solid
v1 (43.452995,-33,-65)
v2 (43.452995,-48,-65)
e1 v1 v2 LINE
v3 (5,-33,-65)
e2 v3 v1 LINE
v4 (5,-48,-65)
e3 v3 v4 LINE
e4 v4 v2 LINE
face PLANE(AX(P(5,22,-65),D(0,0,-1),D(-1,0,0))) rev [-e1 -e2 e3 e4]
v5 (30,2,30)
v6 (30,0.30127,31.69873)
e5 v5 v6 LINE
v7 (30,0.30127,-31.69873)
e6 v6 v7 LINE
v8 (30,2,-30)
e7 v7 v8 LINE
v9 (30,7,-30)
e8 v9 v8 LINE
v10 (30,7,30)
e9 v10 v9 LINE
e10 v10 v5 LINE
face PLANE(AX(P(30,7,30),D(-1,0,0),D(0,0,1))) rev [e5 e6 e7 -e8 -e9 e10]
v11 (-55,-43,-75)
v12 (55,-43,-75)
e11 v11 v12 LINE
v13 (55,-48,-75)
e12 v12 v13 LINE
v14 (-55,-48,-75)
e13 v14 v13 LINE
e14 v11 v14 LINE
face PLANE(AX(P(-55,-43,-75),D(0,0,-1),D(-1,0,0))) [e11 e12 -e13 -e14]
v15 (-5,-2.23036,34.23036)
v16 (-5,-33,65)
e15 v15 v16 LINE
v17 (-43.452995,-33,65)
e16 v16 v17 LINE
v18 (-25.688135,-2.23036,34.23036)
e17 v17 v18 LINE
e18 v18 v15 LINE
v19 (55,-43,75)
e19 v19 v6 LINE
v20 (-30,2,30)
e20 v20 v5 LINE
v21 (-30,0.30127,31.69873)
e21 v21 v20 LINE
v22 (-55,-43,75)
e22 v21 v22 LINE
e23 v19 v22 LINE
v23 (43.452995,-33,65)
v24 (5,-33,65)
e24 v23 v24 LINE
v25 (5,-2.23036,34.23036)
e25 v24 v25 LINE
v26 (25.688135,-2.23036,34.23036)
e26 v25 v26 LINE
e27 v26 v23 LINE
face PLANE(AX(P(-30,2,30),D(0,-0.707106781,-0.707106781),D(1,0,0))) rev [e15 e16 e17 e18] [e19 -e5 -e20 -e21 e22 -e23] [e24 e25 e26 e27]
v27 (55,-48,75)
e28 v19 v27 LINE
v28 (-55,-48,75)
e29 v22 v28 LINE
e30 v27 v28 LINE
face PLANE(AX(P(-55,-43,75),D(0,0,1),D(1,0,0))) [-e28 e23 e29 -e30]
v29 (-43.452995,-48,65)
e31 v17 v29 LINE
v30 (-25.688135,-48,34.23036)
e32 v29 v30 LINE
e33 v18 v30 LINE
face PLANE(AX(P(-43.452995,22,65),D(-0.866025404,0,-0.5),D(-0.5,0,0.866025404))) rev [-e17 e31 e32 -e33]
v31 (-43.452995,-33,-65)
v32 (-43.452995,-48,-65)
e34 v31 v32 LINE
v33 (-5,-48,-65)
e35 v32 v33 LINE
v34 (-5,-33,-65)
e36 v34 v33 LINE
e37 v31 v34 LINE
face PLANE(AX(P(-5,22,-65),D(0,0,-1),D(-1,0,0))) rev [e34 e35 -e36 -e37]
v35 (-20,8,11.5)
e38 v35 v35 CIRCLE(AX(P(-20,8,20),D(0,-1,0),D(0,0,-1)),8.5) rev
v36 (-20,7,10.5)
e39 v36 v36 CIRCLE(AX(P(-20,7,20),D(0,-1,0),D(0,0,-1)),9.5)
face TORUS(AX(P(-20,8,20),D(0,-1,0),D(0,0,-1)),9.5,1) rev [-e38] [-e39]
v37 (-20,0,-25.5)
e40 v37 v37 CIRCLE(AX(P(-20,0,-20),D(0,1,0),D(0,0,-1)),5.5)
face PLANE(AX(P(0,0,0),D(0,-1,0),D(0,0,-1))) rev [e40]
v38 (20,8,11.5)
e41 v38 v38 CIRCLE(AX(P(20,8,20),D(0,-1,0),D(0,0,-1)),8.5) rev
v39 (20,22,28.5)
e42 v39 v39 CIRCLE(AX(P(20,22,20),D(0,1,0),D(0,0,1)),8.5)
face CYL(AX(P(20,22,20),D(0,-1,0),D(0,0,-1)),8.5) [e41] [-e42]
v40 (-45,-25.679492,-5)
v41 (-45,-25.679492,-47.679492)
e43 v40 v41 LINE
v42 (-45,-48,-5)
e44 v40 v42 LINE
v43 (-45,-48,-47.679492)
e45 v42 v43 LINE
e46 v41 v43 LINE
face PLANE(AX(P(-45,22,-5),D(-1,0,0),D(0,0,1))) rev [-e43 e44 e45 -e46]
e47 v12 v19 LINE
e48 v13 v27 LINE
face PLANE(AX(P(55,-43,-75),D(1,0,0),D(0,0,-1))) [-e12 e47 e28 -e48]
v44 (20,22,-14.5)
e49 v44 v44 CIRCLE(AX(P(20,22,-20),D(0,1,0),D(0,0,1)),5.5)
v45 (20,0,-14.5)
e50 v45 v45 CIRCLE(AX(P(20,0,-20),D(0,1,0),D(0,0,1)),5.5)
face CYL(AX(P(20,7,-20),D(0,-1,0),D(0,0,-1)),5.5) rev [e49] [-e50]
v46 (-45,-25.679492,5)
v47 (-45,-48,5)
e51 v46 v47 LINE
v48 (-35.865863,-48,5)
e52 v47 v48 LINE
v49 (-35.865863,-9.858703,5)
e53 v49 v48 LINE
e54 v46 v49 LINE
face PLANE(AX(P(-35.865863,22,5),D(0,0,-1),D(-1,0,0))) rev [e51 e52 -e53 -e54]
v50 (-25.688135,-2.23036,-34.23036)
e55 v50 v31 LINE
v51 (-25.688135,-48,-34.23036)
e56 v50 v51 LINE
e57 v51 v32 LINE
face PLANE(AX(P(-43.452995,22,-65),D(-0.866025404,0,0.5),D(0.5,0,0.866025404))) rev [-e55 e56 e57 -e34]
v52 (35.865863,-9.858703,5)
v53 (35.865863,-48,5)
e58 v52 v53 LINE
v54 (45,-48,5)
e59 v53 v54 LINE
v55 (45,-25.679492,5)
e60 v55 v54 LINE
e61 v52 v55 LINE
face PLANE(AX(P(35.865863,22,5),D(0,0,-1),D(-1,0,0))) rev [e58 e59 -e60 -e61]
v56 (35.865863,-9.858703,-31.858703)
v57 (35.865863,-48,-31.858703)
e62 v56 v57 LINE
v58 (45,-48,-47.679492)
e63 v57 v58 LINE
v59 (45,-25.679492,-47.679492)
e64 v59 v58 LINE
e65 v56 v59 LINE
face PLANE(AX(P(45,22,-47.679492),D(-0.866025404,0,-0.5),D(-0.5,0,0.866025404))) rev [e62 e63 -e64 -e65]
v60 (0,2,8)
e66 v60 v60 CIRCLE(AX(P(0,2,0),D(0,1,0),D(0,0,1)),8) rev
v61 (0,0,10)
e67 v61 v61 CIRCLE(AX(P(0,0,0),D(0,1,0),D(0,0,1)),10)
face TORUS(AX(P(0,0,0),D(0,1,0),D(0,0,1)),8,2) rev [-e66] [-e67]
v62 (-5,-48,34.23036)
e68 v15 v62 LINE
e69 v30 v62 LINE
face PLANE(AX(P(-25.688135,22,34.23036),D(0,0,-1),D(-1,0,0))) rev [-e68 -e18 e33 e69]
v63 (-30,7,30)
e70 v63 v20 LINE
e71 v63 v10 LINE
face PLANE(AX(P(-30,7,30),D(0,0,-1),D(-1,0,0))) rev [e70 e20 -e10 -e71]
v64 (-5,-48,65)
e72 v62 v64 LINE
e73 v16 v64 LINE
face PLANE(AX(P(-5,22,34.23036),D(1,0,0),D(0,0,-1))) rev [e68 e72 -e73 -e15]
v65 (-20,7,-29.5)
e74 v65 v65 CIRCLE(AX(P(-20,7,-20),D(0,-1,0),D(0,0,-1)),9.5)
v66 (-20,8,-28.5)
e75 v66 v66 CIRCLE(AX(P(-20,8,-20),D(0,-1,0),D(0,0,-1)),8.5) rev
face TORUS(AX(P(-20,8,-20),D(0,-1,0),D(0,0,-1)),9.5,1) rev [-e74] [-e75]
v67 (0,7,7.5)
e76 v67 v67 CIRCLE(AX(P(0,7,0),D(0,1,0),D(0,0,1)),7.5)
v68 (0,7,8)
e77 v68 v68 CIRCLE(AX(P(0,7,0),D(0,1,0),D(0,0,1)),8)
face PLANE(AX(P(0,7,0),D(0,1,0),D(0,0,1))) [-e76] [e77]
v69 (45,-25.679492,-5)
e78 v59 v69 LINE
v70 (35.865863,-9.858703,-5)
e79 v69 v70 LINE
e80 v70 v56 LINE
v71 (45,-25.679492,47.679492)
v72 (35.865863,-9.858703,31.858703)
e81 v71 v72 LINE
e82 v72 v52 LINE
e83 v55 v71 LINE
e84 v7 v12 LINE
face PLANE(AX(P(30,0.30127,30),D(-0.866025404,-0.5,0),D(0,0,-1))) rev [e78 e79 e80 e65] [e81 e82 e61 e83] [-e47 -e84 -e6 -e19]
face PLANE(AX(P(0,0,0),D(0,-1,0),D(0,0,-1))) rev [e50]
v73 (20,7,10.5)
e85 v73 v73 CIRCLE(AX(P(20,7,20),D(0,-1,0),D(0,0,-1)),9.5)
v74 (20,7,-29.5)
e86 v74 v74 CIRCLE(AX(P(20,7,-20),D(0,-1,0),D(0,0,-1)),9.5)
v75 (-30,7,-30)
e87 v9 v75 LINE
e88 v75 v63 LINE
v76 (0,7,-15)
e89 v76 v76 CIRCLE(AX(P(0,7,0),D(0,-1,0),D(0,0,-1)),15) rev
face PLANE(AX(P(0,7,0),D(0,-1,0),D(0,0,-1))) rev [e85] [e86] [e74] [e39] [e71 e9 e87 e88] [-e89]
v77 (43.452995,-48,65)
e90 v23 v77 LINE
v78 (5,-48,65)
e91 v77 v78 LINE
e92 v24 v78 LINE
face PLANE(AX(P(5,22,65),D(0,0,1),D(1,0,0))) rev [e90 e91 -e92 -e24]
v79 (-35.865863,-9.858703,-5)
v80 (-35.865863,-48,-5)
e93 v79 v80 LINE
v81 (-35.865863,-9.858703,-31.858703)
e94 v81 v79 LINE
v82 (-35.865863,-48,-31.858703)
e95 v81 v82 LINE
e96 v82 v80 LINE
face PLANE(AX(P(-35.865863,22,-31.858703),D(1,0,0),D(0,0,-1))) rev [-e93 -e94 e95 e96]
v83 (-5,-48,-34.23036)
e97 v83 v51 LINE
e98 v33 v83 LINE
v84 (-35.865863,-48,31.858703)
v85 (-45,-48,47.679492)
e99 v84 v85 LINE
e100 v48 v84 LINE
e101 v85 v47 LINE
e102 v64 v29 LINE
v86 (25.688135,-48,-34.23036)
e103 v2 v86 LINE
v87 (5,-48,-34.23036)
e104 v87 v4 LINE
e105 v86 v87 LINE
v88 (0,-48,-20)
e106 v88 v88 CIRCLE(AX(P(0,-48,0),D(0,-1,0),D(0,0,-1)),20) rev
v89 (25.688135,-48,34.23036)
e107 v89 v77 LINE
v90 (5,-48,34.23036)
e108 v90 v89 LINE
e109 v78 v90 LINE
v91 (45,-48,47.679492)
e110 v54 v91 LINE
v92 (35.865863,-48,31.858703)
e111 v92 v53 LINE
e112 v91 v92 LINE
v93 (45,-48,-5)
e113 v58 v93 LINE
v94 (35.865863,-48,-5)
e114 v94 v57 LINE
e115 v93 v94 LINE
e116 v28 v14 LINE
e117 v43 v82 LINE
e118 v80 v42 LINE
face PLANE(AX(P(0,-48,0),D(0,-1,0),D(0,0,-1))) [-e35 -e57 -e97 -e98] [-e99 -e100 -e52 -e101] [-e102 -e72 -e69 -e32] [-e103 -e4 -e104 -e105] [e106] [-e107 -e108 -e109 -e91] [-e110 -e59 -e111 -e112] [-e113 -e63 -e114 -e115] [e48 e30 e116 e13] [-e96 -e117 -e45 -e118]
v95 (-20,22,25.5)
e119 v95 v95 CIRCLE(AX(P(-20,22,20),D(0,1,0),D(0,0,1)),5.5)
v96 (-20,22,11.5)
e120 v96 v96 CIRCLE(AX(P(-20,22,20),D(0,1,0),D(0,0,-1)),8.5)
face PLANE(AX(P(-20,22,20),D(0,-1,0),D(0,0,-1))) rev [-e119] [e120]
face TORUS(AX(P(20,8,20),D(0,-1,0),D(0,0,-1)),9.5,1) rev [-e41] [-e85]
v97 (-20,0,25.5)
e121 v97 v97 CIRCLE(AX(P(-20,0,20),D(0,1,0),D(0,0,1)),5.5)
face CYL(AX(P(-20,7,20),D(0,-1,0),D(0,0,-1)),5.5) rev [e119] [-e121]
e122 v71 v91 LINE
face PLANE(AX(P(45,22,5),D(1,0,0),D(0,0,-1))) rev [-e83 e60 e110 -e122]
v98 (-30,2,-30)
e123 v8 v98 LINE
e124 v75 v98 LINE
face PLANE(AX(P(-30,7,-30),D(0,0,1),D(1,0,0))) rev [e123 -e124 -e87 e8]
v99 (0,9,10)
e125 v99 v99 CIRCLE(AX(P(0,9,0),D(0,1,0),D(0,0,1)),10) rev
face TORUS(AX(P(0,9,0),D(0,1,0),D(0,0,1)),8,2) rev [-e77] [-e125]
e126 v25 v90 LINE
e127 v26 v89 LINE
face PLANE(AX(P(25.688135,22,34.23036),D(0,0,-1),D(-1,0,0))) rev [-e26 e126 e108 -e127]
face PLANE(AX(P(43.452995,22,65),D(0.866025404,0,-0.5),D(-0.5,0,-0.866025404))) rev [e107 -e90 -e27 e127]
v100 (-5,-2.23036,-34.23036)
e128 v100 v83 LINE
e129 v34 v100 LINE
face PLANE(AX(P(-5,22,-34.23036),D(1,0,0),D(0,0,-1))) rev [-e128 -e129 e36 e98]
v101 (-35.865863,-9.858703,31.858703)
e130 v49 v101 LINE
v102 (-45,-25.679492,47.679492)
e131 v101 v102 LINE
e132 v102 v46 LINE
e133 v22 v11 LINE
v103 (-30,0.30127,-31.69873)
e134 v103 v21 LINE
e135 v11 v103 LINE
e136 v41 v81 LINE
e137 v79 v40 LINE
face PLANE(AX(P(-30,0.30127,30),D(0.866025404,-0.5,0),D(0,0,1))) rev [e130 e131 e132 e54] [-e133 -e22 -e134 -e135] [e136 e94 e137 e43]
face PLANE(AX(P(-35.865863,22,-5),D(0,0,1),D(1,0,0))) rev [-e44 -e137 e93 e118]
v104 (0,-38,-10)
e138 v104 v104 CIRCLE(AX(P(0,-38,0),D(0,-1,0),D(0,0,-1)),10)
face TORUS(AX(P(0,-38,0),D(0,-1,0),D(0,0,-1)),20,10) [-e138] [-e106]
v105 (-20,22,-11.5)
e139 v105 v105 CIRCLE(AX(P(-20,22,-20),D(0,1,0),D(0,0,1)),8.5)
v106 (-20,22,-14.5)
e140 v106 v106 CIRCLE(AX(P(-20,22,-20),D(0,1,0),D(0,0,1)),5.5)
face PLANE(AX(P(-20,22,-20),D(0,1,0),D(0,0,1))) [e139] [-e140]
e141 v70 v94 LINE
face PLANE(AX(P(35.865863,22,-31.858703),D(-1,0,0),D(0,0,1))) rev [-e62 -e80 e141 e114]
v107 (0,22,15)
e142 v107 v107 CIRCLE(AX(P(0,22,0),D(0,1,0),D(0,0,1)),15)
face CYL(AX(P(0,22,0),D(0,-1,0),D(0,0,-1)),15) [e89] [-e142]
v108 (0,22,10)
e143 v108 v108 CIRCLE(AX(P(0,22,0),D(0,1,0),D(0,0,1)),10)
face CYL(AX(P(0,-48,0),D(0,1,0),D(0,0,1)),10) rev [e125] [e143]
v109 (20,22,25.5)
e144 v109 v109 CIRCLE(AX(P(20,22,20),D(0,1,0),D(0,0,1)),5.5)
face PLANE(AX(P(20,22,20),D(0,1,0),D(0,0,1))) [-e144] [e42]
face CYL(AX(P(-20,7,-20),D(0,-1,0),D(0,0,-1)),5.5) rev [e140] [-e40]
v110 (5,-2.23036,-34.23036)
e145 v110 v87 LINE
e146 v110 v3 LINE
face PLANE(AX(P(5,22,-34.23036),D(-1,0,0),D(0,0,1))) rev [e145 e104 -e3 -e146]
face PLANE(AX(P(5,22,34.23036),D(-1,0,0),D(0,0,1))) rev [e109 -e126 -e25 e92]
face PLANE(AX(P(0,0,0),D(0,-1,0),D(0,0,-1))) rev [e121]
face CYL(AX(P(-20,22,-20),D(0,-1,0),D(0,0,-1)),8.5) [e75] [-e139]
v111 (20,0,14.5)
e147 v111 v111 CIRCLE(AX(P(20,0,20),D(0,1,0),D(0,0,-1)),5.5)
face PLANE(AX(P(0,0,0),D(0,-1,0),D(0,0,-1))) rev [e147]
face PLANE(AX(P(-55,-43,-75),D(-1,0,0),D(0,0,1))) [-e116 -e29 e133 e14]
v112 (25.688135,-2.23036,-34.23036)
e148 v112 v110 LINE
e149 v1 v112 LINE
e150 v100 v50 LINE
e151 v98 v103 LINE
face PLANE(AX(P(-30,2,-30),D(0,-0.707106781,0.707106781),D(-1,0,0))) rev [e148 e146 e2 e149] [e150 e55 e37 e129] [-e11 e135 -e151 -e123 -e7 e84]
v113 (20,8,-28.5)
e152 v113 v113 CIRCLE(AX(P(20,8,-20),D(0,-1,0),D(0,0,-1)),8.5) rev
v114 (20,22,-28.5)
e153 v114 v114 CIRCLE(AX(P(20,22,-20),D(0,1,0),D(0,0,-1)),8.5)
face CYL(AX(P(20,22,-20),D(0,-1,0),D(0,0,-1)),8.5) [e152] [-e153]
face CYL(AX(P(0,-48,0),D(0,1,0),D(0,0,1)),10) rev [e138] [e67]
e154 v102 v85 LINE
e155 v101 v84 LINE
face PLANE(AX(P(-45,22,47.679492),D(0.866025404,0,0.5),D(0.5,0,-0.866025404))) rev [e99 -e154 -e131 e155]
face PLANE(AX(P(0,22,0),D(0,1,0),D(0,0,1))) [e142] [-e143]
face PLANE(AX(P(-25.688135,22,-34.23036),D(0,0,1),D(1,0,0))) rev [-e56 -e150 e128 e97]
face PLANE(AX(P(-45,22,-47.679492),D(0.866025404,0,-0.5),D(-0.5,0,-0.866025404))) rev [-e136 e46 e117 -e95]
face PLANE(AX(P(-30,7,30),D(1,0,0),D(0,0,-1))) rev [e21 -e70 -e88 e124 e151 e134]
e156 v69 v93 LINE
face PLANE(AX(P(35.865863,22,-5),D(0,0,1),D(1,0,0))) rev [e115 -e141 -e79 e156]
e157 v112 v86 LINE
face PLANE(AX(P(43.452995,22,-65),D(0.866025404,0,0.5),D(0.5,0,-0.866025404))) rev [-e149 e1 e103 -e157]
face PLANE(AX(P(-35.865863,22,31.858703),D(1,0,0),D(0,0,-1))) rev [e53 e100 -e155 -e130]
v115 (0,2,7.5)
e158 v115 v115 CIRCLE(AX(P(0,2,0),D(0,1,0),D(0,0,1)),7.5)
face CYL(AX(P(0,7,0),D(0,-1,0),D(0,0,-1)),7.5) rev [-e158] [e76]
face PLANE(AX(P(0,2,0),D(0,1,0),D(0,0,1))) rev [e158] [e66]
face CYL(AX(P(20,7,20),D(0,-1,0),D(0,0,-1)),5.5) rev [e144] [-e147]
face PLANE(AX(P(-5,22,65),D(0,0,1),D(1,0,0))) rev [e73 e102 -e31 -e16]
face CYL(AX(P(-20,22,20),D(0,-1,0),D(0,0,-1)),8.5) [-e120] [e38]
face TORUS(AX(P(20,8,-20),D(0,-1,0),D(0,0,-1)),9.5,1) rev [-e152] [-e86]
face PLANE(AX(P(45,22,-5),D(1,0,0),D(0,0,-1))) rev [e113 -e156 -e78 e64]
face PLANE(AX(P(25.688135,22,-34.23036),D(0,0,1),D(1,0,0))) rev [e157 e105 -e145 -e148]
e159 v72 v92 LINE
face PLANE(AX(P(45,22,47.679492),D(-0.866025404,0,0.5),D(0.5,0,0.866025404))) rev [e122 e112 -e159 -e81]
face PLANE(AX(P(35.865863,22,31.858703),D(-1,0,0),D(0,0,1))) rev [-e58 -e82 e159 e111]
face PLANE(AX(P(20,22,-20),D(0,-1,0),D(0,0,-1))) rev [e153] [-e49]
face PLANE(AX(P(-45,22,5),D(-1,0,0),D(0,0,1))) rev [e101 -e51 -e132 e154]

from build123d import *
from OCP.BRepFilletAPI import BRepFilletAPI_MakeChamfer

# Parameters (mm, degrees)
SKETCH_1_W               = 60
SKETCH_1_H               = 60
SKETCH_1_R               = 5.5
EXTRUDE_1_DEPTH          = 7
SKETCH_2_R               = 8.5
SKETCH_2_R_2             = 5.5
SKETCH_2_R_3             = 15
EXTRUDE_2_DEPTH          = 15
SKETCH_3_W               = 60
SKETCH_3_H               = 60
EXTRUDE_3_DEPTH          = 48
SKETCH_5_W               = 110
SKETCH_5_H               = 150
EXTRUDE_4_DEPTH          = 5
CUT_EXTRUDE_1_DEPTH      = 109.050913925
CUT_EXTRUDE_1_DEPTH_BACK = 109.050913925
SKETCH_4_R               = 10
FILLET_1_R               = 1
FILLET_4_R               = 10
EXTRUDE_START            = 55
SKETCH_6_R               = 10
SKETCH_6_R_2             = 7.5
EXTRUDE_5_DEPTH          = 5
FILLET_5_R               = 2
CHAMFER_1_SIZE           = 45
CHAMFER_2_SIZE           = 43.301270189
CHAMFER_2_SIZE_2         = 25
CUT_EXTRUDE_2_DEPTH      = 117.404467268


with BuildPart() as part:
    # 草圖1 → 填料-伸長1 (new body)
    with BuildSketch(Plane(origin=(0, 0, 0), x_dir=(1, 0, 0), z_dir=(0, 1, 0))):
        Rectangle(SKETCH_1_W, SKETCH_1_H)
        with Locations(Location((20, 20, 0), (0, 0, 270))):
            Circle(SKETCH_1_R, mode=Mode.SUBTRACT)
        with Locations(Location((-20, 20, 0), (0, 0, 90))):
            Circle(SKETCH_1_R, mode=Mode.SUBTRACT)
        with Locations(Location((20, -20, 0), (0, 0, 90))):
            Circle(SKETCH_1_R, mode=Mode.SUBTRACT)
        with Locations(Location((-20, -20, 0), (0, 0, 270))):
            Circle(SKETCH_1_R, mode=Mode.SUBTRACT)
    extrude(amount=EXTRUDE_1_DEPTH)

    # 草圖2 → 填料-伸長2 (add)
    # profile 1 of 5: a face of its own
    with BuildSketch(Plane(origin=(0, 7, 0), x_dir=(1, 0, 0), z_dir=(0, 1, 0))):
        with Locations(Location((-20, 20, 0), (0, 0, 90))):
            Circle(SKETCH_2_R)
        with Locations(Location((-20, 20, 0), (0, 0, 90))):
            Circle(SKETCH_2_R_2, mode=Mode.SUBTRACT)
    # profile 2 of 5: a face of its own
    with BuildSketch(Plane(origin=(0, 7, 0), x_dir=(1, 0, 0), z_dir=(0, 1, 0))):
        with Locations(Location((20, 20, 0), (0, 0, 90))):
            Circle(SKETCH_2_R)
        with Locations(Location((20, 20, 0), (0, 0, 270))):
            Circle(SKETCH_2_R_2, mode=Mode.SUBTRACT)
    # profile 3 of 5: a face of its own
    with BuildSketch(Plane(origin=(0, 7, 0), x_dir=(1, 0, 0), z_dir=(0, 1, 0))):
        with Locations(Location((20, -20, 0), (0, 0, 90))):
            Circle(SKETCH_2_R)
        with Locations(Location((20, -20, 0), (0, 0, 90))):
            Circle(SKETCH_2_R_2, mode=Mode.SUBTRACT)
    # profile 4 of 5: a face of its own
    with BuildSketch(Plane(origin=(0, 7, 0), x_dir=(1, 0, 0), z_dir=(0, 1, 0))):
        with Locations(Location((-20, -20, 0), (0, 0, 90))):
            Circle(SKETCH_2_R)
        with Locations(Location((-20, -20, 0), (0, 0, 270))):
            Circle(SKETCH_2_R_2, mode=Mode.SUBTRACT)
    # profile 5 of 5: a face of its own
    with BuildSketch(Plane(origin=(0, 7, 0), x_dir=(1, 0, 0), z_dir=(0, 1, 0))):
        with Locations(Location((0, 0, 0), (0, 0, 90))):
            Circle(SKETCH_2_R_3)
    extrude(amount=EXTRUDE_2_DEPTH)

    # 草圖3 → 填料-伸長3 (add)
    with BuildSketch(Plane.XZ):
        Rectangle(SKETCH_3_W, SKETCH_3_H)
    extrude(amount=EXTRUDE_3_DEPTH)

    # 草圖5 → 填料-伸長4 (add)
    with BuildSketch(Plane.XZ.offset(48)):
        Rectangle(SKETCH_5_W, SKETCH_5_H)
    extrude(amount=-EXTRUDE_4_DEPTH)

    # 草圖4 → 除料-伸長1 (cut, two sides: drawn at the far end of the back side and taken through both)
    with BuildSketch(Plane(origin=(0, 7, 0), x_dir=(1, 0, 0), z_dir=(0, 1, 0)).offset(-CUT_EXTRUDE_1_DEPTH_BACK)):
        with Locations(Location((0, 0, 0), (0, 0, 270))):
            Circle(SKETCH_4_R)
    extrude(amount=CUT_EXTRUDE_1_DEPTH + CUT_EXTRUDE_1_DEPTH_BACK, mode=Mode.SUBTRACT)

    # 圓角1
    fillet_1_edges = [part.edges().sort_by_distance(p)[0] for p in [
        (-20, 7, -11.5),
        (20, 7, -11.5),
        (20, 7, 28.5),
        (-20, 7, 28.5),
    ]]
    fillet(fillet_1_edges, radius=FILLET_1_R)

    # 圓角4
    fillet_4_edges = [part.edges().sort_by_distance(p)[0] for p in [
        (0, -48, -10),
    ]]
    fillet(fillet_4_edges, radius=FILLET_4_R)

    # 草圖6 → 填料-伸長5 (add)
    with BuildSketch(Plane(origin=(0, -48, 0), x_dir=(1, 0, 0), z_dir=(0, 1, 0)).offset(EXTRUDE_START)):
        with Locations(Location((0, 0, 0), (0, 0, 270))):
            Circle(SKETCH_6_R)
        with Locations(Location((0, 0, 0), (0, 0, 270))):
            Circle(SKETCH_6_R_2, mode=Mode.SUBTRACT)
    extrude(amount=-EXTRUDE_5_DEPTH)

    # 圓角5
    fillet_5_edges = [part.edges().sort_by_distance(p)[0] for p in [
        (0, 2, -10),
        (0, 7, -10),
    ]]
    fillet(fillet_5_edges, radius=FILLET_5_R)

    # 導角1
    chamfer_1_edges = [part.edges().sort_by_distance(p)[0] for p in [
        (0, -43, 30),
        (0, -43, -30),
    ]]
    chamfer(chamfer_1_edges, length=CHAMFER_1_SIZE - 0.0001)  # a hair under: the kernel refuses the full size

    # 導角2
    chamfer_2_edges_1 = [part.edges().sort_by_distance(p)[0] for p in [
        (30, -43, 0),
    ]]
    chamfer_2_side_1 = [part.faces().sort_by_distance(p)[0] for p in [
        (30, -42.5, 0),
    ]]
    chamfer_2_edges_2 = [part.edges().sort_by_distance(p)[0] for p in [
        (-30, -43, 0),
    ]]
    chamfer_2_side_2 = [part.faces().sort_by_distance(p)[0] for p in [
        (-30.5, -43, 0),
    ]]
    chamfer_2 = BRepFilletAPI_MakeChamfer(part.part.solid().wrapped)
    for e in chamfer_2_edges_1:
        chamfer_2.Add(CHAMFER_2_SIZE - 0.0001, CHAMFER_2_SIZE_2 - 0.0001, e.wrapped, chamfer_2_side_1[0].wrapped)
    for e in chamfer_2_edges_2:
        chamfer_2.Add(CHAMFER_2_SIZE_2 - 0.0001, CHAMFER_2_SIZE - 0.0001, e.wrapped, chamfer_2_side_2[0].wrapped)
    add(Compound.cast(chamfer_2.Shape()), mode=Mode.REPLACE)  # a hair under: the kernel refuses the full size

    # 草圖7 → 除料-伸長2 (cut, through all)
    with BuildSketch(Plane.XZ.offset(48)):
        Polygon((-43.452994616, -65), (-25.688134905, -34.230360391), (-5, -34.230360391), (-5, -65), align=None)
        Polygon((-45, -47.679491924), (-35.865863045, -31.858702635), (-35.865863045, -5), (-45, -5), align=None)
        Polygon((35.865863045, -5), (45, -5), (45, -47.679491924), (35.865863045, -31.858702635), align=None)
        Polygon((5, -34.230360391), (5, -65), (43.452994616, -65), (25.688134905, -34.230360391), align=None)
        Polygon((-35.865863045, 5), (-45, 5), (-45, 47.679491924), (-35.865863045, 31.858702635), align=None)
        Polygon((-5, 34.230360391), (-5, 65), (-43.452994616, 65), (-25.688134905, 34.230360391), align=None)
        Polygon((35.865863045, 31.858702635), (35.865863045, 5), (45, 5), (45, 47.679491924), align=None)
        Polygon((25.688134905, 34.230360391), (5, 34.230360391), (5, 65), (43.452994616, 65), align=None)
    extrude(amount=-CUT_EXTRUDE_2_DEPTH, mode=Mode.SUBTRACT)


solid = part.part
